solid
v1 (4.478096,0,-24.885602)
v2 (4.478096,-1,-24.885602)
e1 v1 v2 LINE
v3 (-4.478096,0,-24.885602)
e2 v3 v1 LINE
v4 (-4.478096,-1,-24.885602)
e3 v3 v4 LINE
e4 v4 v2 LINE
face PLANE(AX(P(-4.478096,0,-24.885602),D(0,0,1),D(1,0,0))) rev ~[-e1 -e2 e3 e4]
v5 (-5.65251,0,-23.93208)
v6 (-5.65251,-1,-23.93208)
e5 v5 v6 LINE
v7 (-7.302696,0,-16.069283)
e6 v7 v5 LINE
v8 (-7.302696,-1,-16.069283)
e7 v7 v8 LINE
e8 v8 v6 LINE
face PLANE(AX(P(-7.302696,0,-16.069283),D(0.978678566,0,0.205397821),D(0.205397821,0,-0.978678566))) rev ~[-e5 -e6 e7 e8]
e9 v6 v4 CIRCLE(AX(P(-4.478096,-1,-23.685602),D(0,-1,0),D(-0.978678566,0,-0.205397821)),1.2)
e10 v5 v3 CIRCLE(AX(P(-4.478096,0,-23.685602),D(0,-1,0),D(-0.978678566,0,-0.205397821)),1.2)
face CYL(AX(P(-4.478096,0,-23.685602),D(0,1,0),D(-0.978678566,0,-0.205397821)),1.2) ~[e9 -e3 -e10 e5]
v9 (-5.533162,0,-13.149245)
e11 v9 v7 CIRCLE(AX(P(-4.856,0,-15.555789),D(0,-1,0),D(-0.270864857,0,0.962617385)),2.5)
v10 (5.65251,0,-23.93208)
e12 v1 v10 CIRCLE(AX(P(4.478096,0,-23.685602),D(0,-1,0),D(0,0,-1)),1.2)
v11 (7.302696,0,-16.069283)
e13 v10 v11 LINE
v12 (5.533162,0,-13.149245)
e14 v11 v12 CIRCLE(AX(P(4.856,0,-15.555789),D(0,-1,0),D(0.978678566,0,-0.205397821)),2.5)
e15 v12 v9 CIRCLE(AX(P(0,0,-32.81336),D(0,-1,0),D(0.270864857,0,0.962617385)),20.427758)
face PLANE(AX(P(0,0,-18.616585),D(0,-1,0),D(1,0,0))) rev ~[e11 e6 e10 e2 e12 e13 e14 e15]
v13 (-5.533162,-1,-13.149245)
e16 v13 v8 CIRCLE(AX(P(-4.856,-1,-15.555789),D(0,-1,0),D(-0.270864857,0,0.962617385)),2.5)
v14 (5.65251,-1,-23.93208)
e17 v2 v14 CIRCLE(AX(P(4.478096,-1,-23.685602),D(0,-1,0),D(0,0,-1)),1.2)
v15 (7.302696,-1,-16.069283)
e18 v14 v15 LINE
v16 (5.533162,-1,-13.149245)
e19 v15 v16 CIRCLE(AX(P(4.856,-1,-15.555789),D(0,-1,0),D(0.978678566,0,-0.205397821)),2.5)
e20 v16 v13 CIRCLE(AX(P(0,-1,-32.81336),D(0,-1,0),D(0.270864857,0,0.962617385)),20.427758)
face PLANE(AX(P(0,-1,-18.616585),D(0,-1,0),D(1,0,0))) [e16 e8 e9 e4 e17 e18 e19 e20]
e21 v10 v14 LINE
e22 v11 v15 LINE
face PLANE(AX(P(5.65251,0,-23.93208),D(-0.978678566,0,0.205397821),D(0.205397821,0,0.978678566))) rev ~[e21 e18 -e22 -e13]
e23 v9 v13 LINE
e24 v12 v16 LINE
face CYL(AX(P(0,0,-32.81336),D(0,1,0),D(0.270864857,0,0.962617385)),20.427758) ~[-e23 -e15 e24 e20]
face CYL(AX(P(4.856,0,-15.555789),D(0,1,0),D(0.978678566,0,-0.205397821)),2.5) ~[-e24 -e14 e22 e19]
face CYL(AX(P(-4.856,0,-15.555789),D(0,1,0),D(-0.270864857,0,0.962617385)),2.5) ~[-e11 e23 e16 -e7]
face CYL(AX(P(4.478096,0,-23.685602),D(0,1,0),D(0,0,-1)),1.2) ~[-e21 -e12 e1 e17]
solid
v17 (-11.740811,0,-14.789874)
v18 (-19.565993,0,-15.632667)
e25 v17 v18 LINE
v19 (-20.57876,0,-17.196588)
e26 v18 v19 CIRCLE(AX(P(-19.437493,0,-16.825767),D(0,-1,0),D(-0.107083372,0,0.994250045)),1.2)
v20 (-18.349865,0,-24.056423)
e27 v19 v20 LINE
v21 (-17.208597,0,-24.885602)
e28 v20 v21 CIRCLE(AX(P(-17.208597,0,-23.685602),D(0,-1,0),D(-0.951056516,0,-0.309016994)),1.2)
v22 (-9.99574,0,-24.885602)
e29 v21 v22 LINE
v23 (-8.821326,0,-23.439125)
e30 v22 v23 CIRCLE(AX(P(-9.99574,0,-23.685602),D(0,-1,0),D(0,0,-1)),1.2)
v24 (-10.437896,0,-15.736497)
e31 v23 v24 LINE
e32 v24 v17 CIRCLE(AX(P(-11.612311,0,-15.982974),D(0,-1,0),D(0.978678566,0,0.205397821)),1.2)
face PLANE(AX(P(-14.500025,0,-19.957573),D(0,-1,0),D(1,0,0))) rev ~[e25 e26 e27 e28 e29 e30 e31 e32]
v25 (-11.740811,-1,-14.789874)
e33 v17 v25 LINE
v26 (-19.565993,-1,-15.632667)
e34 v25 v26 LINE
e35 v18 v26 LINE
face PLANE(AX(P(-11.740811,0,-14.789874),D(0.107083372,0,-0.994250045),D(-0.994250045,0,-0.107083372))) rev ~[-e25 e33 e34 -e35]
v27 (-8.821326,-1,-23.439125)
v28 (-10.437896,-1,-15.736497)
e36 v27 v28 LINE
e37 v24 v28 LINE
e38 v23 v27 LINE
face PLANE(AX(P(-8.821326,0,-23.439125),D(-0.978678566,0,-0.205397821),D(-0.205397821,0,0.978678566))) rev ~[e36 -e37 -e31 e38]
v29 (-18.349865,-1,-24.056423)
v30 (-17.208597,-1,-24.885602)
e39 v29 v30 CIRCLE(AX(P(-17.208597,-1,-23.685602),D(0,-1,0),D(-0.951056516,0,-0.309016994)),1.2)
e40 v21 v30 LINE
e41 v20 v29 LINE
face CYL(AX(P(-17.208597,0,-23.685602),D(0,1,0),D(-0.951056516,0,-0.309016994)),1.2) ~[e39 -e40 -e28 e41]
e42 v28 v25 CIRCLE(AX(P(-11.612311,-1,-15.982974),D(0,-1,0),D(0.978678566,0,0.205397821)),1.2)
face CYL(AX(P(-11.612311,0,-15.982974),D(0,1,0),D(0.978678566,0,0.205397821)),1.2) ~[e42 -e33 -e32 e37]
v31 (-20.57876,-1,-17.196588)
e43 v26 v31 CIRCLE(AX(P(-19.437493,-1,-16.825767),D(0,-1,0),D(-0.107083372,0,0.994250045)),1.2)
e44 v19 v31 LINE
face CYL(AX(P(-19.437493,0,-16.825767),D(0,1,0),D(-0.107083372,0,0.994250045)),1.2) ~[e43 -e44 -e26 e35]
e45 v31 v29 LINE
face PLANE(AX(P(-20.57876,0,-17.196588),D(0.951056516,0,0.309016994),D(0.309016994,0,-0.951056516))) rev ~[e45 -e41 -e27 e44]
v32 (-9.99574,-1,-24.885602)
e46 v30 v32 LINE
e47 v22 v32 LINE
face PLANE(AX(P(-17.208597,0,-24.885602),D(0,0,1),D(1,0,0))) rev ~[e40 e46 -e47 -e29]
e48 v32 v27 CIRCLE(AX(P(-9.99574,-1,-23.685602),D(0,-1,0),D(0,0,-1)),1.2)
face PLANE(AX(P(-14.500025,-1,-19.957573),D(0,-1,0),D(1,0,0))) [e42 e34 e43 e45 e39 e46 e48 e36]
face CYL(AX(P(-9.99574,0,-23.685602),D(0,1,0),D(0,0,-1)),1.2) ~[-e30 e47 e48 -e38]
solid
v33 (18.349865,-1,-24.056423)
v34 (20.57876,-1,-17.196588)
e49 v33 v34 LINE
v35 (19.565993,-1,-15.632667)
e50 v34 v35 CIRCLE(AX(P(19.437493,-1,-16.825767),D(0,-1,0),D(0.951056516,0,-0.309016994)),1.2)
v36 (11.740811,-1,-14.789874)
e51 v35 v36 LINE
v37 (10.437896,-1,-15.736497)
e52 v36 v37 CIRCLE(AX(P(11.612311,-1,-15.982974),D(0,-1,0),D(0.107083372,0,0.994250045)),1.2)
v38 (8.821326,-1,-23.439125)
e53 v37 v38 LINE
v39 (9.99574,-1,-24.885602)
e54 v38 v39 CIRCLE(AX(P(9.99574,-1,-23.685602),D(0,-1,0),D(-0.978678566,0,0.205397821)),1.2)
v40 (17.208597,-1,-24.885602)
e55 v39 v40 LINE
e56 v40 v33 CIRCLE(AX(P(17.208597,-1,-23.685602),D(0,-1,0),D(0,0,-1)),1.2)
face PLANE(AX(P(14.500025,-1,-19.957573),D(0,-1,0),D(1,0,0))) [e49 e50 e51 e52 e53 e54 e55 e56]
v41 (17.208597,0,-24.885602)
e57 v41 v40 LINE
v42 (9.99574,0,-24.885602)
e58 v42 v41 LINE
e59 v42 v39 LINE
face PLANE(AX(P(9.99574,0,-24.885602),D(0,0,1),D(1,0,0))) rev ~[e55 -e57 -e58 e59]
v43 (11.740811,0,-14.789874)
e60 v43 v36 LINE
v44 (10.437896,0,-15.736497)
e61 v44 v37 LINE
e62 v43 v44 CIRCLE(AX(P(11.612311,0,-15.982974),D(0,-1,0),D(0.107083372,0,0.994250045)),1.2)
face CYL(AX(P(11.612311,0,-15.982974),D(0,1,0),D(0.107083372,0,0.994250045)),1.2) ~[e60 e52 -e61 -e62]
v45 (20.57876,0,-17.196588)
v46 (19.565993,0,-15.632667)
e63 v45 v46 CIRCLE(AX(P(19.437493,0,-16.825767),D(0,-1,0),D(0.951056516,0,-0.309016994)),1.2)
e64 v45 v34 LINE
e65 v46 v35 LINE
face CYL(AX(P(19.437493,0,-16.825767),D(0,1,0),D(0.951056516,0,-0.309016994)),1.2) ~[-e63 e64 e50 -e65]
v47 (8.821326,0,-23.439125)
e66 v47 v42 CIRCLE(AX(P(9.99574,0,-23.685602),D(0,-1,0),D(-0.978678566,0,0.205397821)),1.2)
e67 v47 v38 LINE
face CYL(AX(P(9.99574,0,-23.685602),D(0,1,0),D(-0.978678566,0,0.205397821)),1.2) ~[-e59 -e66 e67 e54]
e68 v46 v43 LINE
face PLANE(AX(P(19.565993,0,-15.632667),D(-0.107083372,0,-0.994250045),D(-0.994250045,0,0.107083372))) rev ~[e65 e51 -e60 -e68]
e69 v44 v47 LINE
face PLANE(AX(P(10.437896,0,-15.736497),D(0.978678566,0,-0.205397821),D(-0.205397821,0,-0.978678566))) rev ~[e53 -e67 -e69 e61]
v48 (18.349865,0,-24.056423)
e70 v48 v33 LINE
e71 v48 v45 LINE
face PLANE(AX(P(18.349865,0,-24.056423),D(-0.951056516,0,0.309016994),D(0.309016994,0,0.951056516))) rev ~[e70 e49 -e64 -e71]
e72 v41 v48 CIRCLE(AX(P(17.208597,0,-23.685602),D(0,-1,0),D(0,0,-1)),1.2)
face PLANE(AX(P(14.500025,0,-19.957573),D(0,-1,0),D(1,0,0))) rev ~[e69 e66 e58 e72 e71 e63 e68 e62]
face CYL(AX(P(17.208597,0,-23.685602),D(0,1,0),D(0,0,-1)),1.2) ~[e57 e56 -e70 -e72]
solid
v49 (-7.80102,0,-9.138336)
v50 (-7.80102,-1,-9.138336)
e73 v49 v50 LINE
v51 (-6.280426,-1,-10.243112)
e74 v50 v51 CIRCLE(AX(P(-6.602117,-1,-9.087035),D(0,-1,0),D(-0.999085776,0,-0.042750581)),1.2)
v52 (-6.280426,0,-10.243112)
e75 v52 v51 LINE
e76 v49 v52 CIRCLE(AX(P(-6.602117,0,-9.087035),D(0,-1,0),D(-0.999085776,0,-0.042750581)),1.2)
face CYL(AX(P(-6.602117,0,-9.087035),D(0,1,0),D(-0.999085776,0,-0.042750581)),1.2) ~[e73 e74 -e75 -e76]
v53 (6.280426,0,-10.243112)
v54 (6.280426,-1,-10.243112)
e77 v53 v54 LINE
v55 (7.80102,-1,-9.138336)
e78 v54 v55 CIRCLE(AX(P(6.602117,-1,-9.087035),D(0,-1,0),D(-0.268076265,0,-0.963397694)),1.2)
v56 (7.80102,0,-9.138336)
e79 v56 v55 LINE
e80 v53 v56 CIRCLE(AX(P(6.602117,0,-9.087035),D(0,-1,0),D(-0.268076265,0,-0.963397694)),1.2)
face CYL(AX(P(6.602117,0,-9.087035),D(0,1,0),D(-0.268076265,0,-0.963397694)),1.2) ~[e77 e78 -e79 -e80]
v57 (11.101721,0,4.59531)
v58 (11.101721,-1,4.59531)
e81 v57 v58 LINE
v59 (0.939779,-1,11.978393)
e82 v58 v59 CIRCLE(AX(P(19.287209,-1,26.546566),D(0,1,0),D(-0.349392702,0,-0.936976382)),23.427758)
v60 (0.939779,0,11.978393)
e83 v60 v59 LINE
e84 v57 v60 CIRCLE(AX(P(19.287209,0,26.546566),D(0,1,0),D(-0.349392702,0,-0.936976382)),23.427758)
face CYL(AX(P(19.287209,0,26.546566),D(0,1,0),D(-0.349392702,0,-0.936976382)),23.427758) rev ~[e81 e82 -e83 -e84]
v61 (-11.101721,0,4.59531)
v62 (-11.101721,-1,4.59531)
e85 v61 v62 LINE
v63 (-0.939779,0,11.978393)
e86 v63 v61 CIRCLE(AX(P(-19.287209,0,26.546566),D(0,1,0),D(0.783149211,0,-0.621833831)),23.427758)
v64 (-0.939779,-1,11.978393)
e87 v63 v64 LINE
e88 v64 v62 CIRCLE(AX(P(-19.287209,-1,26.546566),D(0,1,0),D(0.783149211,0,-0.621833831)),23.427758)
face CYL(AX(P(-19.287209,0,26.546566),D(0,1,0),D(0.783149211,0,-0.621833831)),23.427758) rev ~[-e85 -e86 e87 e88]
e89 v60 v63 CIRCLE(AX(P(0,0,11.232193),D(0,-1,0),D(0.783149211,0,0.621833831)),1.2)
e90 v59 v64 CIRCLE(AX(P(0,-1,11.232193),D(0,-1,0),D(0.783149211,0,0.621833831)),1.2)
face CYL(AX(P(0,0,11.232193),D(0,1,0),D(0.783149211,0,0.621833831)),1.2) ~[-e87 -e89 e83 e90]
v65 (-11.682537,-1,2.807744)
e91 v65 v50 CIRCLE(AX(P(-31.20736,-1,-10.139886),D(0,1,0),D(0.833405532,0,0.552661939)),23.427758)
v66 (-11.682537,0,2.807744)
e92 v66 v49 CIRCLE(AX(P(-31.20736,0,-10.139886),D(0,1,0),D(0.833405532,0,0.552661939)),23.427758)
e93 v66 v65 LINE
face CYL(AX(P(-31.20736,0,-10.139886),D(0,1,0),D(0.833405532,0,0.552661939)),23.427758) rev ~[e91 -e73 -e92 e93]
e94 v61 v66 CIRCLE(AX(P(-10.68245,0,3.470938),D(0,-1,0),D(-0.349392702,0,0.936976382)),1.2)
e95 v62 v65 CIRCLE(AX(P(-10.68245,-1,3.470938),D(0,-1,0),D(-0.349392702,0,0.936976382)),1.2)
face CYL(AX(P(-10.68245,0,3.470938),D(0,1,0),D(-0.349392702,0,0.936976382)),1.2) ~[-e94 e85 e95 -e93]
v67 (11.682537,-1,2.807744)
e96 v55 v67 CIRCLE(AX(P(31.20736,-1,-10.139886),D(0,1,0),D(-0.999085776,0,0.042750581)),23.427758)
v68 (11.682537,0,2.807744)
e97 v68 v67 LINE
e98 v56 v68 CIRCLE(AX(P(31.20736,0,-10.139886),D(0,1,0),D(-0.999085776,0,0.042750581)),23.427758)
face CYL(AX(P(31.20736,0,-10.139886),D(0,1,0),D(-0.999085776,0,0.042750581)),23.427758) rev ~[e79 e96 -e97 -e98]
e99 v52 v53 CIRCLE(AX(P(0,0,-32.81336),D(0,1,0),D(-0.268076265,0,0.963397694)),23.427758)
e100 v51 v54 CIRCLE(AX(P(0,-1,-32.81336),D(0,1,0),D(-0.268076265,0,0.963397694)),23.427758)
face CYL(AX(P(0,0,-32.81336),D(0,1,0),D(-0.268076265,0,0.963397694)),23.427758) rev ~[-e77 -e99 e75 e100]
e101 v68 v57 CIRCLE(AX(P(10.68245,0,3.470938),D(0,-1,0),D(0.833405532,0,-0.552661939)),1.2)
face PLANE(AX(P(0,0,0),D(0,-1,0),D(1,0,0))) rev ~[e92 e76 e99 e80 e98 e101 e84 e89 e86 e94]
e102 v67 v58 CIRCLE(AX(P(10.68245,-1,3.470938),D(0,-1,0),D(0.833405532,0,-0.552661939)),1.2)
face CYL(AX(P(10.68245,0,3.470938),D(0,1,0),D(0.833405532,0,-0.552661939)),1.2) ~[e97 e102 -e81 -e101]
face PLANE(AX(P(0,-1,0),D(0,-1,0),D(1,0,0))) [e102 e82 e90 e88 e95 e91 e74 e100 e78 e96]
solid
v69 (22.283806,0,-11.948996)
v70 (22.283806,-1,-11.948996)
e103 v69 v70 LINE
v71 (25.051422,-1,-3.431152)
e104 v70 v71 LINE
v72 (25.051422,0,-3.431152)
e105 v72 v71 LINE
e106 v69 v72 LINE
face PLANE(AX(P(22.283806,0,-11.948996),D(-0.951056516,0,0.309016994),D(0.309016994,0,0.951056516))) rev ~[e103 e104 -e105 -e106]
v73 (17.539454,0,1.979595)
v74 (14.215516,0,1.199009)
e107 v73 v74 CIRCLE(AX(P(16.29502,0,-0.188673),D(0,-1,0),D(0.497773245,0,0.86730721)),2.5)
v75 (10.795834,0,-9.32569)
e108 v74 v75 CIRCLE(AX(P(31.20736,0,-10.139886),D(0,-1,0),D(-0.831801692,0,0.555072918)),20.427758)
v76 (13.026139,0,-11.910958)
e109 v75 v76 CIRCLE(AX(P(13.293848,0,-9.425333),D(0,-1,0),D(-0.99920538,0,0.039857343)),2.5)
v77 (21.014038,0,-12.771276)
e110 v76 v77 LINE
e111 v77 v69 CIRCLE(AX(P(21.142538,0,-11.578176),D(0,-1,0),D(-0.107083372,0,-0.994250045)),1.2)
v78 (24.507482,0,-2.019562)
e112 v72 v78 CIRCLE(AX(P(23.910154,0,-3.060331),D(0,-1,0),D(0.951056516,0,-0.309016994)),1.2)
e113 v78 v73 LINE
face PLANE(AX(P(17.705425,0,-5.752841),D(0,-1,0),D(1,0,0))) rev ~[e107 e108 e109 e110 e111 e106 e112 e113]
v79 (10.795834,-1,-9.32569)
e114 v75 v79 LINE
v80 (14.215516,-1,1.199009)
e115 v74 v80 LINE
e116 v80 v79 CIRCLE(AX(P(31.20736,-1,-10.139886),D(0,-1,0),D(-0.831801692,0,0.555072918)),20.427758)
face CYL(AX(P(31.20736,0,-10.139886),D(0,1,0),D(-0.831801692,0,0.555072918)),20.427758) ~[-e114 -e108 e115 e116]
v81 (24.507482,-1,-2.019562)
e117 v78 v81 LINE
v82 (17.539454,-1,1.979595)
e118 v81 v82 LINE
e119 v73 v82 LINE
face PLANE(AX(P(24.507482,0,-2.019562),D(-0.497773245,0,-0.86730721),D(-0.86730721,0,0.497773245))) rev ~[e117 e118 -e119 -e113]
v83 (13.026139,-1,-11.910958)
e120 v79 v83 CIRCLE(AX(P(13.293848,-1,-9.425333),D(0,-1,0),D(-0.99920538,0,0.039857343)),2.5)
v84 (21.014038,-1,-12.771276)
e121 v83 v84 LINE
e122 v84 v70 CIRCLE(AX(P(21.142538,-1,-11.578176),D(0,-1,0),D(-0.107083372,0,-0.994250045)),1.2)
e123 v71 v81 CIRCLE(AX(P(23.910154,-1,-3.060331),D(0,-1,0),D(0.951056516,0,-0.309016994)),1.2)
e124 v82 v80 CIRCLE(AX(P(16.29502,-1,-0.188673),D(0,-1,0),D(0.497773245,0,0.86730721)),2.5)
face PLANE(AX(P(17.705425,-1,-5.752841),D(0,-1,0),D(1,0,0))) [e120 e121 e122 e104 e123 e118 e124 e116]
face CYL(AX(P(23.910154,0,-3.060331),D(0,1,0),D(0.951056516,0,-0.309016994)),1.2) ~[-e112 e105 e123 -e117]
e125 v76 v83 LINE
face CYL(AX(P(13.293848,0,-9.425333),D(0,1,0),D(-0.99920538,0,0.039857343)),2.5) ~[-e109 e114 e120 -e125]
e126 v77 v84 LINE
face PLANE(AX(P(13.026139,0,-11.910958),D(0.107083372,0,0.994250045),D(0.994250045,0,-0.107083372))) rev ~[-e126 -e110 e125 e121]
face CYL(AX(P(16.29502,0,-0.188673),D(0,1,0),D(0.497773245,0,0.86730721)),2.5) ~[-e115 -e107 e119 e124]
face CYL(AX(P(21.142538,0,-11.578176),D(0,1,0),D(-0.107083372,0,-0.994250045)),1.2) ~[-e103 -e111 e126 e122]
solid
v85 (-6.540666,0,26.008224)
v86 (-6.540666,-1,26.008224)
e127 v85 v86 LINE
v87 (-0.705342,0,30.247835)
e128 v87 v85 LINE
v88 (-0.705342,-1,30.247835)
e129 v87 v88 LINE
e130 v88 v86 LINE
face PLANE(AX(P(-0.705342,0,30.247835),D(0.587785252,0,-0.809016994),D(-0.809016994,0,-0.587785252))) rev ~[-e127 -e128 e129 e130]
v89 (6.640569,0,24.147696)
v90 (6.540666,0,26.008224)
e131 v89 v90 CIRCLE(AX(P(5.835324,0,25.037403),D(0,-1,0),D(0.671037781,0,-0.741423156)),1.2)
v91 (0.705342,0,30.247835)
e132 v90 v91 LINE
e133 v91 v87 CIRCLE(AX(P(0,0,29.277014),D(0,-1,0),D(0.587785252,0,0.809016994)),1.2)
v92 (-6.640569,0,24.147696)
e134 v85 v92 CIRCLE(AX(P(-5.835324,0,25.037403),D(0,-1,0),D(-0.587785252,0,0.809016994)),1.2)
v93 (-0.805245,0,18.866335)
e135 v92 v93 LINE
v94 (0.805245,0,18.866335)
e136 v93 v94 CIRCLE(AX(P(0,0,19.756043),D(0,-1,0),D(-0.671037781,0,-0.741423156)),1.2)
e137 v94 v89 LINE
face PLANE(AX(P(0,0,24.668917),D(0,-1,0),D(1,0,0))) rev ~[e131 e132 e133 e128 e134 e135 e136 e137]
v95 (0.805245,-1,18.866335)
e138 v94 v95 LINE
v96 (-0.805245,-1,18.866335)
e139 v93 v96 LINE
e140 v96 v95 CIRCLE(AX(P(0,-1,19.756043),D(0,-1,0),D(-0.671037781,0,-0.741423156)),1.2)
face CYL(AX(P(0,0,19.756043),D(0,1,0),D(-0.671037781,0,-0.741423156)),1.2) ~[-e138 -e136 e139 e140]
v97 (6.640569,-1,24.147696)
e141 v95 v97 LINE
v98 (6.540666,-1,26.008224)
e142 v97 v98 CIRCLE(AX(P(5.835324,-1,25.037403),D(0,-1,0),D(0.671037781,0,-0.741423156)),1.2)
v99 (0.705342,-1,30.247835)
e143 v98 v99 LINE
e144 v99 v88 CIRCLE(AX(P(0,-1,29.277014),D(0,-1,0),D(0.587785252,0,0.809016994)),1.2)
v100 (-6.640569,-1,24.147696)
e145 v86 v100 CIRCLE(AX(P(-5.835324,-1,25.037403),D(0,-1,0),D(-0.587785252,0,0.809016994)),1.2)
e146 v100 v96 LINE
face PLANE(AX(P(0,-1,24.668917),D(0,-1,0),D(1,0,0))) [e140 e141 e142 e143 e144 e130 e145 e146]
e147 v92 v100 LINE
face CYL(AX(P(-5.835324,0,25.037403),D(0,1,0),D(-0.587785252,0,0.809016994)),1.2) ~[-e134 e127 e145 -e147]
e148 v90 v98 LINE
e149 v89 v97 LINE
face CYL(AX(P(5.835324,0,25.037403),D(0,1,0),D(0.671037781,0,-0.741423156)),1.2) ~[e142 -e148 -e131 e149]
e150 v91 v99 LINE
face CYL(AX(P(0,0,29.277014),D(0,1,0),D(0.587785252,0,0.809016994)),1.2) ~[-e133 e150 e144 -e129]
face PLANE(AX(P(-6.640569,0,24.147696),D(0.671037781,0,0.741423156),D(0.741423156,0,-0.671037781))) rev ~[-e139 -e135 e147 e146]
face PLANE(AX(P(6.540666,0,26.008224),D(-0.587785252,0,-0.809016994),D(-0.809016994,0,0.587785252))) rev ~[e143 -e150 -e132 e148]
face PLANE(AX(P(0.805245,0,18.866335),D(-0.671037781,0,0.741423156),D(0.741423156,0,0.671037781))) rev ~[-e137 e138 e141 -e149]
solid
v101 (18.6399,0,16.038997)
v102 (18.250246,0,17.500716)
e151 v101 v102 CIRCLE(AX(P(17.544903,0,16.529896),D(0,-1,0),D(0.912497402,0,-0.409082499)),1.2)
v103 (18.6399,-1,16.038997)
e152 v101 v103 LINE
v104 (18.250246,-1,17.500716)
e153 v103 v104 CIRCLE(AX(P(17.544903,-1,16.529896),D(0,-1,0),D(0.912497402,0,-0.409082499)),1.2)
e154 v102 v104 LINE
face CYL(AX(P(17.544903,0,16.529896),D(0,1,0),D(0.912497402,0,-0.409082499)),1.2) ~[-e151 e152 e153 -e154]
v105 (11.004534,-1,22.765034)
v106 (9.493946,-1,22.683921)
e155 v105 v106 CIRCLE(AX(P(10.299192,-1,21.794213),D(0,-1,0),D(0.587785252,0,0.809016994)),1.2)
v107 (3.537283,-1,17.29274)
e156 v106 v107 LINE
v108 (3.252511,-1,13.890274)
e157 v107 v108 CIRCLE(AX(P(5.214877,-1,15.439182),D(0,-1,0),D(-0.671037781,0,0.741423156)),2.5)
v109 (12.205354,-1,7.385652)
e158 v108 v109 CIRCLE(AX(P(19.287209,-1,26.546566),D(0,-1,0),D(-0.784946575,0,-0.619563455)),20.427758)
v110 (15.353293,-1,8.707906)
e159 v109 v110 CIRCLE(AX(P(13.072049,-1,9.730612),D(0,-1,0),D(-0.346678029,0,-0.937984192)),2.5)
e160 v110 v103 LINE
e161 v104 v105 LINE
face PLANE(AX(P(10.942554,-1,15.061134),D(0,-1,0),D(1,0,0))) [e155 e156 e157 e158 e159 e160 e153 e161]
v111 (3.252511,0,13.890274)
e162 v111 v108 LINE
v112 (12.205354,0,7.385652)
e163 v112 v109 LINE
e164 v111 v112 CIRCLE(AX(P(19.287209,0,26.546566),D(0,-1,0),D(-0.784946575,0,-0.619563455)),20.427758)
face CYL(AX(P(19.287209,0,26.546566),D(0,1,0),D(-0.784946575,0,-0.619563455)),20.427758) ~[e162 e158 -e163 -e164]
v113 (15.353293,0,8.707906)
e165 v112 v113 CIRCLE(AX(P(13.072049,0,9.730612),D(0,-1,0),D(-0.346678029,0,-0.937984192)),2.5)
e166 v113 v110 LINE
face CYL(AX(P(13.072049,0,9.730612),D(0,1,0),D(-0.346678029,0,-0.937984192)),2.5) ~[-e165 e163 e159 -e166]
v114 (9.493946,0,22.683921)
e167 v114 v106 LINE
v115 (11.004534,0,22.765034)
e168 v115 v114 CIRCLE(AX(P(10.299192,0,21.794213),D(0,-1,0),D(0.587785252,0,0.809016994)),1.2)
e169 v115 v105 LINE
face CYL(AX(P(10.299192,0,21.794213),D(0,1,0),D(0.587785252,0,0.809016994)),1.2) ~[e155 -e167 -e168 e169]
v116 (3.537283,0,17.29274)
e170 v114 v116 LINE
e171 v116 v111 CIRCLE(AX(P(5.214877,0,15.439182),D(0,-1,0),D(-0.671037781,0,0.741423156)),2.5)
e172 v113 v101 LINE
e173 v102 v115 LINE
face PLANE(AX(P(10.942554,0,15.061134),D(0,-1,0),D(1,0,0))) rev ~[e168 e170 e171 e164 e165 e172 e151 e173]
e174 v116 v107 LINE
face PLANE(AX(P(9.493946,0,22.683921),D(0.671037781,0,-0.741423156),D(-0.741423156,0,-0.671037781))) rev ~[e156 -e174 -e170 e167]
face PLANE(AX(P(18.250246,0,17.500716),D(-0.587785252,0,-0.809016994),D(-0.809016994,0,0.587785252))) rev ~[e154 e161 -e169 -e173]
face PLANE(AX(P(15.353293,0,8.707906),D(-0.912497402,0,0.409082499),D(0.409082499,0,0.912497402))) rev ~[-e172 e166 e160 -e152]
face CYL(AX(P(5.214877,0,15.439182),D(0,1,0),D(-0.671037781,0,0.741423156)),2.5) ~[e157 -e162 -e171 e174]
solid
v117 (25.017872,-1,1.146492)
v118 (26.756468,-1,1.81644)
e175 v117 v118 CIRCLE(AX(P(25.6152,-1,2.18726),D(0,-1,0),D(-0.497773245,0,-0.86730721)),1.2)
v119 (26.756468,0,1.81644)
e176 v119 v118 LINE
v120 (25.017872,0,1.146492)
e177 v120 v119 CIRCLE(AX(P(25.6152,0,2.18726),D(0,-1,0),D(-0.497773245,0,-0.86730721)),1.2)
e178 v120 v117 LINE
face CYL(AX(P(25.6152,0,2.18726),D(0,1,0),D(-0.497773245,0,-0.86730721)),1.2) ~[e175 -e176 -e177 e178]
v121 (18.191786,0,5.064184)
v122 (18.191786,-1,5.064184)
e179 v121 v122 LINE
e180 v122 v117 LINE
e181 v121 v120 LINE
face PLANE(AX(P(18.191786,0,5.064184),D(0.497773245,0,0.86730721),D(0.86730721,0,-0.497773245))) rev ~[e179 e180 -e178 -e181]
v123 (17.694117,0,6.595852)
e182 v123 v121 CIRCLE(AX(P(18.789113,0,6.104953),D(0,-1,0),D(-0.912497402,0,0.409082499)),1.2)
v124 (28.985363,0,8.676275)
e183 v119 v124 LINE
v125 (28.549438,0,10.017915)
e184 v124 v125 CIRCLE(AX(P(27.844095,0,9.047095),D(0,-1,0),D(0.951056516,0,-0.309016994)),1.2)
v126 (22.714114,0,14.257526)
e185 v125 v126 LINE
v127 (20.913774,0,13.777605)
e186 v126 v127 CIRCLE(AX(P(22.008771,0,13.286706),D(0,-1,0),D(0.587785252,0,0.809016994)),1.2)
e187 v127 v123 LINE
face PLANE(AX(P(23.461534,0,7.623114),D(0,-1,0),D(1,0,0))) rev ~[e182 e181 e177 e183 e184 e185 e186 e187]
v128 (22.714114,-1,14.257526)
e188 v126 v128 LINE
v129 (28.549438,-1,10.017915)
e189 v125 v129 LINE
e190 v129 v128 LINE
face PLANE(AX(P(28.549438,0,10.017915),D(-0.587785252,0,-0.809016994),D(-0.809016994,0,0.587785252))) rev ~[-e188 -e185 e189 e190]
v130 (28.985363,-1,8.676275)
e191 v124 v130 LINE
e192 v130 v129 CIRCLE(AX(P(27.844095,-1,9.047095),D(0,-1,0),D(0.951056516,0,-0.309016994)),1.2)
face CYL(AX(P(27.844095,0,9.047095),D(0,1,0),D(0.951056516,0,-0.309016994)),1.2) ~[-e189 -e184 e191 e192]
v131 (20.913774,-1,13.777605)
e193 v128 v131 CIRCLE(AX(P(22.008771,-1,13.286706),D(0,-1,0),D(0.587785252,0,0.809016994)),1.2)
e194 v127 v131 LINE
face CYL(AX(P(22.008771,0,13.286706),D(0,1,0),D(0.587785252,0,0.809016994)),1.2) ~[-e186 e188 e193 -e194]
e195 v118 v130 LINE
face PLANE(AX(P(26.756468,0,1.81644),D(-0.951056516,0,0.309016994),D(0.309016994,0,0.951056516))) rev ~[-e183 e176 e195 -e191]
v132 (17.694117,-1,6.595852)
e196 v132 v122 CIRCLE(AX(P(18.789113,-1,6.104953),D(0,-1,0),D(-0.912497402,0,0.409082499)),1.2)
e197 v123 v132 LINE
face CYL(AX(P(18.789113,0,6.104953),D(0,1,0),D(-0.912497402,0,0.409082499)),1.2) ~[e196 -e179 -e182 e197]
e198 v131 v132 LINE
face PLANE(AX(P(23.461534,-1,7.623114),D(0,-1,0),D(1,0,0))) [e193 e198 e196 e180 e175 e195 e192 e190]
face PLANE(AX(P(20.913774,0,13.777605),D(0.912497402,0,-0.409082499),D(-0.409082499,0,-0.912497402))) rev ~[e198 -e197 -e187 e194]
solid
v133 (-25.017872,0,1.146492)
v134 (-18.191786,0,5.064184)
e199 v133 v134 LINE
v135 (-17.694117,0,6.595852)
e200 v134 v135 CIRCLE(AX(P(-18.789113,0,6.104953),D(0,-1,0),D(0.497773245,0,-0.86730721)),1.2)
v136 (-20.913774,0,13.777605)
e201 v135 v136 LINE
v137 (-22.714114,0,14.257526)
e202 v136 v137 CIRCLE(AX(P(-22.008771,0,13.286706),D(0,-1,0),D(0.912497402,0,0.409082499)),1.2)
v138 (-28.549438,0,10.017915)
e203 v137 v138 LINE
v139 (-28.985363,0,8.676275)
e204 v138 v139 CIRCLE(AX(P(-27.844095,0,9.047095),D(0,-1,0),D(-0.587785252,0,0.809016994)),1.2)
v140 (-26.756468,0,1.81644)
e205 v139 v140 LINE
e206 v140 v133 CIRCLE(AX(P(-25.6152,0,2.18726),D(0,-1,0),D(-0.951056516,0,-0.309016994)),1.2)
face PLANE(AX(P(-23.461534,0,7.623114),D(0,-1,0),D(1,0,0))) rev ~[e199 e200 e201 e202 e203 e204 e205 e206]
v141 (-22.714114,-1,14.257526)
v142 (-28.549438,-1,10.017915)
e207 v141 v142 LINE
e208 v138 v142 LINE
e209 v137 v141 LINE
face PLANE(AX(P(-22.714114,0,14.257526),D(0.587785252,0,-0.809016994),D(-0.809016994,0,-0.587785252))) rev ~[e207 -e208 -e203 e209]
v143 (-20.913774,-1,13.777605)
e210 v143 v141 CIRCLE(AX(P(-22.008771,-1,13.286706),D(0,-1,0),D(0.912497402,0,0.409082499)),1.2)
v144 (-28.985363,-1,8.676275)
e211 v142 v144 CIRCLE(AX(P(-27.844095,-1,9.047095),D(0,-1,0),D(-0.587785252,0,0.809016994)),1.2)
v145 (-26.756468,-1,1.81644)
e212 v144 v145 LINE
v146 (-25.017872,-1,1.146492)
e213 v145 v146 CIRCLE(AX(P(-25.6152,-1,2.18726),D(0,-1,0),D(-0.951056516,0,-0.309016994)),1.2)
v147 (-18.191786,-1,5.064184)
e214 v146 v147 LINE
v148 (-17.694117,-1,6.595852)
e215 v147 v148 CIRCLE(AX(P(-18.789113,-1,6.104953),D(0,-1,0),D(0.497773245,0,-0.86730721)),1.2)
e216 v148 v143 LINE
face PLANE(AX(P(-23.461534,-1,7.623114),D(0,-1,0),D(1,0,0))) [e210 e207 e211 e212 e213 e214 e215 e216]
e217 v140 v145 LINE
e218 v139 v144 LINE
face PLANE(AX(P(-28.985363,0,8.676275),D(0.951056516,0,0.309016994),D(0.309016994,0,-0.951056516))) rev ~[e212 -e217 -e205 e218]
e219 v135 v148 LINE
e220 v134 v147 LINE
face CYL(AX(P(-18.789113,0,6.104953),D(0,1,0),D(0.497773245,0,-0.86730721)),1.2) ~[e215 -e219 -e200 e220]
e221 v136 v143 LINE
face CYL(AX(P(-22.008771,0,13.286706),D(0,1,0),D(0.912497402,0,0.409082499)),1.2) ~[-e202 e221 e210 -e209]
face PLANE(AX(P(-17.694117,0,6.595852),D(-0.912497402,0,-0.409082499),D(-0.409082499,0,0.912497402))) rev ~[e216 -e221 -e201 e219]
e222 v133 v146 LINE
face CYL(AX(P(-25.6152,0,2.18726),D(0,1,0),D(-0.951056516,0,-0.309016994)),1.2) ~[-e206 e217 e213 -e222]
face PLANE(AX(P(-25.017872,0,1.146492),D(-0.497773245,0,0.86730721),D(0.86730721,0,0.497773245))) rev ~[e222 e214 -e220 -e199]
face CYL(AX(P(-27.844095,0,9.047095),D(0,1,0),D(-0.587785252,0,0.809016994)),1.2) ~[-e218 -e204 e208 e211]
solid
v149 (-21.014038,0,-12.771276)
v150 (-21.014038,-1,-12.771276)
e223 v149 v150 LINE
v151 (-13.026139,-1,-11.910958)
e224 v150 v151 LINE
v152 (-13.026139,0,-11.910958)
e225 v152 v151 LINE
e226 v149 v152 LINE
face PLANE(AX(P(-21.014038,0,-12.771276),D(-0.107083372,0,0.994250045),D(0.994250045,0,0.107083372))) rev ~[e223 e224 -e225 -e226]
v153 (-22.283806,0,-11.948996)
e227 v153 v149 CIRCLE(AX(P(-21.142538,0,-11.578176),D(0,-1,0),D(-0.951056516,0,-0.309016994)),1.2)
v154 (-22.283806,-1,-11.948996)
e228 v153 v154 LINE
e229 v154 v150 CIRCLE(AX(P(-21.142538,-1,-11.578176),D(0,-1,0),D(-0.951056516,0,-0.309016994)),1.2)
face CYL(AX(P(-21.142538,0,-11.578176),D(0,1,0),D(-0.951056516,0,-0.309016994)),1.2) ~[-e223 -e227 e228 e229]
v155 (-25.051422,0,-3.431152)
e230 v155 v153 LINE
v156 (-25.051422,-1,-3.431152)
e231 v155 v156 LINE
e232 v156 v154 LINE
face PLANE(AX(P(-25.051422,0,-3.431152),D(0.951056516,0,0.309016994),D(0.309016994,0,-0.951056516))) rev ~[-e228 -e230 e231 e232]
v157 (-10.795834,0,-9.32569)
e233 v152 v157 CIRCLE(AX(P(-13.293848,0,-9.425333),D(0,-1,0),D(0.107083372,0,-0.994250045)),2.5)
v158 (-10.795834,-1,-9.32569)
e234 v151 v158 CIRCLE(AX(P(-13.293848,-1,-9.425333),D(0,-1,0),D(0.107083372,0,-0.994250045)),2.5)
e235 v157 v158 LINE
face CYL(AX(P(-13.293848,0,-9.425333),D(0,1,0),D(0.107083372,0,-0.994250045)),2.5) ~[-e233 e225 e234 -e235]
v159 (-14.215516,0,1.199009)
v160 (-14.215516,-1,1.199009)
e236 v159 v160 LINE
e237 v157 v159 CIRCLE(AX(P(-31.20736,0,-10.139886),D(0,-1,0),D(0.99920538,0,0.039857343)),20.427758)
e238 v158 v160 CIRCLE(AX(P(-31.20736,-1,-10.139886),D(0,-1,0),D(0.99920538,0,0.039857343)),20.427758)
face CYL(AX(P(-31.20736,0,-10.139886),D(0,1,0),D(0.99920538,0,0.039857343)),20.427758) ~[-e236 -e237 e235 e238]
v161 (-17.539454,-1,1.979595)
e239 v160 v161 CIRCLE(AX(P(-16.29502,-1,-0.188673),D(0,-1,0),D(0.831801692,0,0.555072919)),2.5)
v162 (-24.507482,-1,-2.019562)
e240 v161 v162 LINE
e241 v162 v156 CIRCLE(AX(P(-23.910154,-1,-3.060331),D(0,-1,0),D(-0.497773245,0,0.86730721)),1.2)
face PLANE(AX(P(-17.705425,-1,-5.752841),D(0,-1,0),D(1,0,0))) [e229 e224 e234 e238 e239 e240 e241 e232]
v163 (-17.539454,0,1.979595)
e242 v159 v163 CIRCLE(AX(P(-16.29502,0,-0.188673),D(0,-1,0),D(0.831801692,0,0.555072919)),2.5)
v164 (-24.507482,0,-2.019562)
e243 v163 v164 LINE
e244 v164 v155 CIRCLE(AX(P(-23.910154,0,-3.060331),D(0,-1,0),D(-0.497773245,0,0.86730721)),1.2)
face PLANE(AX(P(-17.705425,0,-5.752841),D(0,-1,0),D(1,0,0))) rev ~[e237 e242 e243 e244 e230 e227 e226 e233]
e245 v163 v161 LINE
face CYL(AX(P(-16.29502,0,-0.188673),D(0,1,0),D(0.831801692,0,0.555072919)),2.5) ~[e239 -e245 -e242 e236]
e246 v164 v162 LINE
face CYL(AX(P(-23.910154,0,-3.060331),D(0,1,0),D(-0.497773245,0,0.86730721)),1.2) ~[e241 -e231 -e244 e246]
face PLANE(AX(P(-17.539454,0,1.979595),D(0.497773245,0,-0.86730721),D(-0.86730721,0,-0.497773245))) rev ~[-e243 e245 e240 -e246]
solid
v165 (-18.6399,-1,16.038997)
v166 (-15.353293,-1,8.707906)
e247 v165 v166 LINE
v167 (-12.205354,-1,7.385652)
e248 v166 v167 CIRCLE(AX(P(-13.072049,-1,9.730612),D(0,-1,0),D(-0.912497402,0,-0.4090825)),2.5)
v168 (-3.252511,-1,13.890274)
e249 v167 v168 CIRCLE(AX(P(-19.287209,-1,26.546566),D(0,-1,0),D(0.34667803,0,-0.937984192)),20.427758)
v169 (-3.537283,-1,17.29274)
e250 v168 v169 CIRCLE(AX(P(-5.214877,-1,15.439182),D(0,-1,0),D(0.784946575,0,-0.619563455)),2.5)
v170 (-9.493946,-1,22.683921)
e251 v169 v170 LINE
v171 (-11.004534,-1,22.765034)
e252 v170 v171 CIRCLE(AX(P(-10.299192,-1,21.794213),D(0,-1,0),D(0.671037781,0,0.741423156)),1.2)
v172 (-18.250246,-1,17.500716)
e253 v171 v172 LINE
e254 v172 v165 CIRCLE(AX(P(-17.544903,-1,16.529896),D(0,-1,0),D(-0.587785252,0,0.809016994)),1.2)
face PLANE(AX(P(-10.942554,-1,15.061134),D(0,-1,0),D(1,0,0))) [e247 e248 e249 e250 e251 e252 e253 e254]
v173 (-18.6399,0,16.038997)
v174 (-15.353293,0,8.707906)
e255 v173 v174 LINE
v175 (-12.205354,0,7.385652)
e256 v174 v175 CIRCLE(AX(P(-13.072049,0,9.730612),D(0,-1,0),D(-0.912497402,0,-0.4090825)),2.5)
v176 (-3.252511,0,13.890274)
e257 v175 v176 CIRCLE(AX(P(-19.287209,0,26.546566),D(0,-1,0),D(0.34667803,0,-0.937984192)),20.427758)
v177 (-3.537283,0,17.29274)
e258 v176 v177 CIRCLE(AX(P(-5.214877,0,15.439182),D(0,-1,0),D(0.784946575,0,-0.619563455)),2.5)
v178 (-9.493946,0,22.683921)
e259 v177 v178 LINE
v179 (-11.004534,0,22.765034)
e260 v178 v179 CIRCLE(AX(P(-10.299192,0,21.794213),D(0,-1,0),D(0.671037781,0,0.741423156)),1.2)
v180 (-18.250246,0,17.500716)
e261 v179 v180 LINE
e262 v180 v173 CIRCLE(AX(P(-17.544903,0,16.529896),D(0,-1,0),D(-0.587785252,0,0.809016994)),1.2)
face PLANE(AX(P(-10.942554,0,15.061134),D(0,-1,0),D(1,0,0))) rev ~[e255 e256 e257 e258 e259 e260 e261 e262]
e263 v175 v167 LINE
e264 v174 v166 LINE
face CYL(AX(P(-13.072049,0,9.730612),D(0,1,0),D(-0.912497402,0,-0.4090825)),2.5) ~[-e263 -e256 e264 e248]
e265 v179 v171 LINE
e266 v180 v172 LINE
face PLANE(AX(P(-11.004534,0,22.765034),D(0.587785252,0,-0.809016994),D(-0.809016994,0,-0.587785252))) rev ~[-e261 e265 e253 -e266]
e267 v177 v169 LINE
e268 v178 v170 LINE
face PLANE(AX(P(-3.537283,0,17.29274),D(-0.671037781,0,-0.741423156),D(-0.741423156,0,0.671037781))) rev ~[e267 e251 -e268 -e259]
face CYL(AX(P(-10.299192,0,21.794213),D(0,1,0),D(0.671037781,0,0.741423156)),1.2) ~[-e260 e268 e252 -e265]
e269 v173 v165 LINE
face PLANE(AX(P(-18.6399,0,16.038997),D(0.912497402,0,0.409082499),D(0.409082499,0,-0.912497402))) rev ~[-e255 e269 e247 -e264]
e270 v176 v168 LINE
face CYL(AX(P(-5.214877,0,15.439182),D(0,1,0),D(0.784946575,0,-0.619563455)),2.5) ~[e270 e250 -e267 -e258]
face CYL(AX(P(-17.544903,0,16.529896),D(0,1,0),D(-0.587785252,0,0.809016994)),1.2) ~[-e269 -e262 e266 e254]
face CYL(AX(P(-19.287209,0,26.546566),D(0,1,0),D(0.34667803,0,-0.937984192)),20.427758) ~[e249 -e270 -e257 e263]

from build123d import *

# Parameters (mm, degrees)
F1_DEPTH = 1


# Not quite as in the source:
# - a feature names something its author has since deleted; it is built from what else it names


with BuildPart() as f1:
    # F0 (on Front) → F1 (new body)
    with BuildSketch(Plane.XZ):
        with BuildLine():
            Line((-17.694116513, 6.5958520163), (-20.9137744033, 13.7776049975))
            ThreePointArc((-20.9137744033, 13.7776049975), (-21.6996777578, 14.4462150283), (-22.7141135884, 14.2575263913))
            Line((-22.7141135884, 14.2575263913), (-28.5494375554, 10.0179153646))
            ThreePointArc((-28.5494375554, 10.0179153646), (-28.9853630722, 9.4179153646), (-28.9853630722, 8.6762745781))
            Line((-28.9853630722, 8.6762745781), (-26.7564676522, 1.8164398378))
            ThreePointArc((-26.7564676522, 1.8164398378), (-26.0466802236, 1.0675171033), (-25.0178719382, 1.1464915793))
            Line((-25.0178719382, 1.1464915793), (-18.191785501, 5.0641843652))
            ThreePointArc((-18.191785501, 5.0641843652), (-17.6478455759, 5.7341326237), (-17.694116513, 6.5958520163))
        make_face()
    extrude(amount=F1_DEPTH)


with BuildPart() as f1b:
    # F0 (on Front) → F1, piece 2 (new body)
    with BuildSketch(Plane.XZ):
        with BuildLine():
            ThreePointArc((-12.2053541777, 7.3856519674), (-7.2800742754, 10.0201626124), (-3.2525105674, 13.8902735969))
            ThreePointArc((-3.2525105674, 13.8902735969), (-2.7235874919, 15.6476925752), (-3.5372825515, 17.2927401232))
            Line((-3.5372825515, 17.2927401232), (-9.4939464638, 22.6839212654))
            ThreePointArc((-9.4939464638, 22.6839212654), (-10.2348492198, 22.9924872502), (-11.0045341042, 22.7650338717))
            Line((-11.0045341042, 22.7650338717), (-18.2502457539, 17.5007162125))
            ThreePointArc((-18.2502457539, 17.5007162125), (-18.7044124814, 16.838989347), (-18.6399003336, 16.0389968198))
            Line((-18.6399003336, 16.0389968198), (-15.3532927565, 8.7079061979))
            ThreePointArc((-15.3532927565, 8.7079061979), (-14.040205168, 7.4256885604), (-12.2053541777, 7.3856519674))
        make_face()
    extrude(amount=F1_DEPTH)


with BuildPart() as f1c:
    # F0 (on Front) → F1, piece 3 (new body)
    with BuildSketch(Plane.XZ):
        with BuildLine():
            Line((0.8052453376, 18.8663351752), (6.6405693046, 24.1476955125))
            ThreePointArc((6.6405693046, 24.1476955125), (7.0335977388, 25.1017458812), (6.5406662698, 26.0082236928))
            Line((6.5406662698, 26.0082236928), (0.7053423028, 30.2478347195))
            ThreePointArc((0.7053423028, 30.2478347195), (0, 30.4770143263), (-0.7053423028, 30.2478347195))
            Line((-0.7053423028, 30.2478347195), (-6.5406662698, 26.0082236928))
            ThreePointArc((-6.5406662698, 26.0082236928), (-7.0335977388, 25.1017458812), (-6.6405693046, 24.1476955125))
            Line((-6.6405693046, 24.1476955125), (-0.8052453376, 18.8663351752))
            ThreePointArc((-0.8052453376, 18.8663351752), (0, 18.5560429622), (0.8052453376, 18.8663351752))
        make_face()
    extrude(amount=F1_DEPTH)


with BuildPart() as f1d:
    # F0 (on Front) → F1, piece 4 (new body)
    with BuildSketch(Plane.XZ):
        with BuildLine():
            ThreePointArc((3.2525105674, 13.8902735969), (7.2800742754, 10.0201626124), (12.2053541777, 7.3856519674))
            ThreePointArc((12.2053541777, 7.3856519674), (14.040205168, 7.4256885604), (15.3532927565, 8.7079061979))
            Line((15.3532927565, 8.7079061979), (18.6399003336, 16.0389968198))
            ThreePointArc((18.6399003336, 16.0389968198), (18.7044124814, 16.838989347), (18.2502457539, 17.5007162125))
            Line((18.2502457539, 17.5007162125), (11.0045341042, 22.7650338717))
            ThreePointArc((11.0045341042, 22.7650338717), (10.2348492198, 22.9924872502), (9.4939464638, 22.6839212654))
            Line((9.4939464638, 22.6839212654), (3.5372825515, 17.2927401232))
            ThreePointArc((3.5372825515, 17.2927401232), (2.7235874919, 15.6476925752), (3.2525105674, 13.8902735969))
        make_face()
    extrude(amount=F1_DEPTH)


with BuildPart() as f1e:
    # F0 (on Front) → F1, piece 5 (new body)
    with BuildSketch(Plane.XZ):
        with BuildLine():
            ThreePointArc((-10.795834294, -9.3256896519), (-11.7794076183, -3.8273615451), (-14.2155162571, 1.1990092285))
            ThreePointArc((-14.2155162571, 1.1990092285), (-15.7234748093, 2.2451172966), (-17.5394536011, 1.9795949568))
            Line((-17.5394536011, 1.9795949568), (-24.5074819356, -2.0195624797))
            ThreePointArc((-24.5074819356, -2.0195624797), (-25.0298971689, -2.6288507405), (-25.0514218607, -3.4311515247))
            Line((-25.0514218607, -3.4311515247), (-22.2838062832, -11.9489964249))
            ThreePointArc((-22.2838062832, -11.9489964249), (-21.7948118729, -12.5854194976), (-21.0140384169, -12.7712760853))
            Line((-21.0140384169, -12.7712760853), (-13.0261393142, -11.9109581221))
            ThreePointArc((-13.0261393142, -11.9109581221), (-11.4009114947, -11.058364655), (-10.795834294, -9.3256896519))
        make_face()
    extrude(amount=F1_DEPTH)


with BuildPart() as f1f:
    # F0 (on Front) → F1, piece 6 (new body)
    with BuildSketch(Plane.XZ):
        with BuildLine():
            Line((-11.7408107436, -14.7898744444), (-19.5659927189, -15.6326673405))
            ThreePointArc((-19.5659927189, -15.6326673405), (-20.4447361381, -16.173493985), (-20.5787604917, -17.1965877874))
            Line((-20.5787604917, -17.1965877874), (-18.3498650717, -24.0564225277))
            ThreePointArc((-18.3498650717, -24.0564225277), (-17.9139395549, -24.6564225277), (-17.2085972521, -24.8856021345))
            Line((-17.2085972521, -24.8856021345), (-9.9957401582, -24.8856021345))
            ThreePointArc((-9.9957401582, -24.8856021345), (-9.0641359335, -24.4419840278), (-8.8213258793, -23.4391247487))
            Line((-8.8213258793, -23.4391247487), (-10.437896418, -15.7364971123))
            ThreePointArc((-10.437896418, -15.7364971123), (-10.9069683941, -15.0121541048), (-11.7408107436, -14.7898744444))
        make_face()
    extrude(amount=F1_DEPTH)


with BuildPart() as f1g:
    # F0 (on Front) → F1, piece 7 (new body)
    with BuildSketch(Plane.XZ):
        with BuildLine():
            ThreePointArc((-5.5331616471, -13.1492451408), (-6.9940543615, -14.2601337772), (-7.3026959181, -16.069283156))
            Line((-7.3026959181, -16.069283156), (-5.652510351, -23.9320795203))
            ThreePointArc((-5.652510351, -23.9320795203), (-5.2344779655, -24.6172063592), (-4.4780960722, -24.8856021345))
            Line((-4.4780960722, -24.8856021345), (4.4780960722, -24.8856021345))
            ThreePointArc((4.4780960722, -24.8856021345), (5.2344779655, -24.6172063592), (5.652510351, -23.9320795203))
            Line((5.652510351, -23.9320795203), (7.3026959181, -16.069283156))
            ThreePointArc((7.3026959181, -16.069283156), (6.9940543615, -14.2601337772), (5.5331616471, -13.1492451408))
            ThreePointArc((5.5331616471, -13.1492451408), (0, -12.3856021345), (-5.5331616471, -13.1492451408))
        make_face()
    extrude(amount=F1_DEPTH)


with BuildPart() as f1h:
    # F0 (on Front) → F1, piece 8 (new body)
    with BuildSketch(Plane.XZ):
        with BuildLine():
            Line((10.437896418, -15.7364971123), (8.8213258793, -23.4391247487))
            ThreePointArc((8.8213258793, -23.4391247487), (9.0641359335, -24.4419840278), (9.9957401582, -24.8856021345))
            Line((9.9957401582, -24.8856021345), (17.2085972521, -24.8856021345))
            ThreePointArc((17.2085972521, -24.8856021345), (17.9139395549, -24.6564225277), (18.3498650717, -24.0564225277))
            Line((18.3498650717, -24.0564225277), (20.5787604917, -17.1965877874))
            ThreePointArc((20.5787604917, -17.1965877874), (20.4447361381, -16.173493985), (19.5659927189, -15.6326673405))
            Line((19.5659927189, -15.6326673405), (11.7408107436, -14.7898744444))
            ThreePointArc((11.7408107436, -14.7898744444), (10.9069683941, -15.0121541048), (10.437896418, -15.7364971123))
        make_face()
    extrude(amount=F1_DEPTH)


with BuildPart() as f1i:
    # F0 (on Front) → F1, piece 9 (new body)
    with BuildSketch(Plane.XZ):
        with BuildLine():
            ThreePointArc((14.2155162571, 1.1990092285), (11.7794076183, -3.8273615451), (10.795834294, -9.3256896519))
            ThreePointArc((10.795834294, -9.3256896519), (11.4009114947, -11.058364655), (13.0261393142, -11.9109581221))
            Line((13.0261393142, -11.9109581221), (21.0140384169, -12.7712760853))
            ThreePointArc((21.0140384169, -12.7712760853), (21.7948118729, -12.5854194976), (22.2838062832, -11.9489964249))
            Line((22.2838062832, -11.9489964249), (25.0514218607, -3.4311515247))
            ThreePointArc((25.0514218607, -3.4311515247), (25.0298971689, -2.6288507405), (24.5074819356, -2.0195624797))
            Line((24.5074819356, -2.0195624797), (17.5394536011, 1.9795949568))
            ThreePointArc((17.5394536011, 1.9795949568), (15.7234748093, 2.2451172966), (14.2155162571, 1.1990092285))
        make_face()
    extrude(amount=F1_DEPTH)


with BuildPart() as f1j:
    # F0 (on Front) → F1, piece 10 (new body)
    with BuildSketch(Plane.XZ):
        with BuildLine():
            Line((18.191785501, 5.0641843652), (25.0178719382, 1.1464915793))
            ThreePointArc((25.0178719382, 1.1464915793), (26.0466802236, 1.0675171033), (26.7564676522, 1.8164398378))
            Line((26.7564676522, 1.8164398378), (28.9853630722, 8.6762745781))
            ThreePointArc((28.9853630722, 8.6762745781), (28.9853630722, 9.4179153646), (28.5494375554, 10.0179153646))
            Line((28.5494375554, 10.0179153646), (22.7141135884, 14.2575263913))
            ThreePointArc((22.7141135884, 14.2575263913), (21.6996777578, 14.4462150283), (20.9137744033, 13.7776049975))
            Line((20.9137744033, 13.7776049975), (17.694116513, 6.5958520163))
            ThreePointArc((17.694116513, 6.5958520163), (17.6478455759, 5.7341326237), (18.191785501, 5.0641843652))
        make_face()
    extrude(amount=F1_DEPTH)


with BuildPart() as f1k:
    # F0 (on Front) → F1, piece 11 (new body)
    with BuildSketch(Plane.XZ):
        with BuildLine():
            ThreePointArc((-6.2804257648, -10.2431120979), (0, -9.3856021345), (6.2804257648, -10.2431120979))
            ThreePointArc((6.2804257648, -10.2431120979), (7.3074595861, -10.0578552589), (7.8010202146, -9.1383355623))
            ThreePointArc((7.8010202146, -9.1383355623), (8.9262380694, -2.900310562), (11.6825368011, 2.8077441352))
            ThreePointArc((11.6825368011, 2.8077441352), (11.8237179817, 3.841758855), (11.1017214044, 4.5953101198))
            ThreePointArc((11.1017214044, 4.5953101198), (5.5167185185, 7.5931116293), (0.939779053, 11.9783934052))
            ThreePointArc((0.939779053, 11.9783934052), (0, 12.4321928078), (-0.939779053, 11.9783934052))
            ThreePointArc((-0.939779053, 11.9783934052), (-5.5167185185, 7.5931116293), (-11.1017214044, 4.5953101198))
            ThreePointArc((-11.1017214044, 4.5953101198), (-11.8237179817, 3.841758855), (-11.6825368011, 2.8077441352))
            ThreePointArc((-11.6825368011, 2.8077441352), (-8.9262380694, -2.900310562), (-7.8010202146, -9.1383355623))
            ThreePointArc((-7.8010202146, -9.1383355623), (-7.3074595861, -10.0578552589), (-6.2804257648, -10.2431120979))
        make_face()
    extrude(amount=F1_DEPTH)


solid = Compound([f1.part, f1b.part, f1c.part, f1d.part, f1e.part, f1f.part, f1g.part, f1h.part, f1i.part, f1j.part, f1k.part])
